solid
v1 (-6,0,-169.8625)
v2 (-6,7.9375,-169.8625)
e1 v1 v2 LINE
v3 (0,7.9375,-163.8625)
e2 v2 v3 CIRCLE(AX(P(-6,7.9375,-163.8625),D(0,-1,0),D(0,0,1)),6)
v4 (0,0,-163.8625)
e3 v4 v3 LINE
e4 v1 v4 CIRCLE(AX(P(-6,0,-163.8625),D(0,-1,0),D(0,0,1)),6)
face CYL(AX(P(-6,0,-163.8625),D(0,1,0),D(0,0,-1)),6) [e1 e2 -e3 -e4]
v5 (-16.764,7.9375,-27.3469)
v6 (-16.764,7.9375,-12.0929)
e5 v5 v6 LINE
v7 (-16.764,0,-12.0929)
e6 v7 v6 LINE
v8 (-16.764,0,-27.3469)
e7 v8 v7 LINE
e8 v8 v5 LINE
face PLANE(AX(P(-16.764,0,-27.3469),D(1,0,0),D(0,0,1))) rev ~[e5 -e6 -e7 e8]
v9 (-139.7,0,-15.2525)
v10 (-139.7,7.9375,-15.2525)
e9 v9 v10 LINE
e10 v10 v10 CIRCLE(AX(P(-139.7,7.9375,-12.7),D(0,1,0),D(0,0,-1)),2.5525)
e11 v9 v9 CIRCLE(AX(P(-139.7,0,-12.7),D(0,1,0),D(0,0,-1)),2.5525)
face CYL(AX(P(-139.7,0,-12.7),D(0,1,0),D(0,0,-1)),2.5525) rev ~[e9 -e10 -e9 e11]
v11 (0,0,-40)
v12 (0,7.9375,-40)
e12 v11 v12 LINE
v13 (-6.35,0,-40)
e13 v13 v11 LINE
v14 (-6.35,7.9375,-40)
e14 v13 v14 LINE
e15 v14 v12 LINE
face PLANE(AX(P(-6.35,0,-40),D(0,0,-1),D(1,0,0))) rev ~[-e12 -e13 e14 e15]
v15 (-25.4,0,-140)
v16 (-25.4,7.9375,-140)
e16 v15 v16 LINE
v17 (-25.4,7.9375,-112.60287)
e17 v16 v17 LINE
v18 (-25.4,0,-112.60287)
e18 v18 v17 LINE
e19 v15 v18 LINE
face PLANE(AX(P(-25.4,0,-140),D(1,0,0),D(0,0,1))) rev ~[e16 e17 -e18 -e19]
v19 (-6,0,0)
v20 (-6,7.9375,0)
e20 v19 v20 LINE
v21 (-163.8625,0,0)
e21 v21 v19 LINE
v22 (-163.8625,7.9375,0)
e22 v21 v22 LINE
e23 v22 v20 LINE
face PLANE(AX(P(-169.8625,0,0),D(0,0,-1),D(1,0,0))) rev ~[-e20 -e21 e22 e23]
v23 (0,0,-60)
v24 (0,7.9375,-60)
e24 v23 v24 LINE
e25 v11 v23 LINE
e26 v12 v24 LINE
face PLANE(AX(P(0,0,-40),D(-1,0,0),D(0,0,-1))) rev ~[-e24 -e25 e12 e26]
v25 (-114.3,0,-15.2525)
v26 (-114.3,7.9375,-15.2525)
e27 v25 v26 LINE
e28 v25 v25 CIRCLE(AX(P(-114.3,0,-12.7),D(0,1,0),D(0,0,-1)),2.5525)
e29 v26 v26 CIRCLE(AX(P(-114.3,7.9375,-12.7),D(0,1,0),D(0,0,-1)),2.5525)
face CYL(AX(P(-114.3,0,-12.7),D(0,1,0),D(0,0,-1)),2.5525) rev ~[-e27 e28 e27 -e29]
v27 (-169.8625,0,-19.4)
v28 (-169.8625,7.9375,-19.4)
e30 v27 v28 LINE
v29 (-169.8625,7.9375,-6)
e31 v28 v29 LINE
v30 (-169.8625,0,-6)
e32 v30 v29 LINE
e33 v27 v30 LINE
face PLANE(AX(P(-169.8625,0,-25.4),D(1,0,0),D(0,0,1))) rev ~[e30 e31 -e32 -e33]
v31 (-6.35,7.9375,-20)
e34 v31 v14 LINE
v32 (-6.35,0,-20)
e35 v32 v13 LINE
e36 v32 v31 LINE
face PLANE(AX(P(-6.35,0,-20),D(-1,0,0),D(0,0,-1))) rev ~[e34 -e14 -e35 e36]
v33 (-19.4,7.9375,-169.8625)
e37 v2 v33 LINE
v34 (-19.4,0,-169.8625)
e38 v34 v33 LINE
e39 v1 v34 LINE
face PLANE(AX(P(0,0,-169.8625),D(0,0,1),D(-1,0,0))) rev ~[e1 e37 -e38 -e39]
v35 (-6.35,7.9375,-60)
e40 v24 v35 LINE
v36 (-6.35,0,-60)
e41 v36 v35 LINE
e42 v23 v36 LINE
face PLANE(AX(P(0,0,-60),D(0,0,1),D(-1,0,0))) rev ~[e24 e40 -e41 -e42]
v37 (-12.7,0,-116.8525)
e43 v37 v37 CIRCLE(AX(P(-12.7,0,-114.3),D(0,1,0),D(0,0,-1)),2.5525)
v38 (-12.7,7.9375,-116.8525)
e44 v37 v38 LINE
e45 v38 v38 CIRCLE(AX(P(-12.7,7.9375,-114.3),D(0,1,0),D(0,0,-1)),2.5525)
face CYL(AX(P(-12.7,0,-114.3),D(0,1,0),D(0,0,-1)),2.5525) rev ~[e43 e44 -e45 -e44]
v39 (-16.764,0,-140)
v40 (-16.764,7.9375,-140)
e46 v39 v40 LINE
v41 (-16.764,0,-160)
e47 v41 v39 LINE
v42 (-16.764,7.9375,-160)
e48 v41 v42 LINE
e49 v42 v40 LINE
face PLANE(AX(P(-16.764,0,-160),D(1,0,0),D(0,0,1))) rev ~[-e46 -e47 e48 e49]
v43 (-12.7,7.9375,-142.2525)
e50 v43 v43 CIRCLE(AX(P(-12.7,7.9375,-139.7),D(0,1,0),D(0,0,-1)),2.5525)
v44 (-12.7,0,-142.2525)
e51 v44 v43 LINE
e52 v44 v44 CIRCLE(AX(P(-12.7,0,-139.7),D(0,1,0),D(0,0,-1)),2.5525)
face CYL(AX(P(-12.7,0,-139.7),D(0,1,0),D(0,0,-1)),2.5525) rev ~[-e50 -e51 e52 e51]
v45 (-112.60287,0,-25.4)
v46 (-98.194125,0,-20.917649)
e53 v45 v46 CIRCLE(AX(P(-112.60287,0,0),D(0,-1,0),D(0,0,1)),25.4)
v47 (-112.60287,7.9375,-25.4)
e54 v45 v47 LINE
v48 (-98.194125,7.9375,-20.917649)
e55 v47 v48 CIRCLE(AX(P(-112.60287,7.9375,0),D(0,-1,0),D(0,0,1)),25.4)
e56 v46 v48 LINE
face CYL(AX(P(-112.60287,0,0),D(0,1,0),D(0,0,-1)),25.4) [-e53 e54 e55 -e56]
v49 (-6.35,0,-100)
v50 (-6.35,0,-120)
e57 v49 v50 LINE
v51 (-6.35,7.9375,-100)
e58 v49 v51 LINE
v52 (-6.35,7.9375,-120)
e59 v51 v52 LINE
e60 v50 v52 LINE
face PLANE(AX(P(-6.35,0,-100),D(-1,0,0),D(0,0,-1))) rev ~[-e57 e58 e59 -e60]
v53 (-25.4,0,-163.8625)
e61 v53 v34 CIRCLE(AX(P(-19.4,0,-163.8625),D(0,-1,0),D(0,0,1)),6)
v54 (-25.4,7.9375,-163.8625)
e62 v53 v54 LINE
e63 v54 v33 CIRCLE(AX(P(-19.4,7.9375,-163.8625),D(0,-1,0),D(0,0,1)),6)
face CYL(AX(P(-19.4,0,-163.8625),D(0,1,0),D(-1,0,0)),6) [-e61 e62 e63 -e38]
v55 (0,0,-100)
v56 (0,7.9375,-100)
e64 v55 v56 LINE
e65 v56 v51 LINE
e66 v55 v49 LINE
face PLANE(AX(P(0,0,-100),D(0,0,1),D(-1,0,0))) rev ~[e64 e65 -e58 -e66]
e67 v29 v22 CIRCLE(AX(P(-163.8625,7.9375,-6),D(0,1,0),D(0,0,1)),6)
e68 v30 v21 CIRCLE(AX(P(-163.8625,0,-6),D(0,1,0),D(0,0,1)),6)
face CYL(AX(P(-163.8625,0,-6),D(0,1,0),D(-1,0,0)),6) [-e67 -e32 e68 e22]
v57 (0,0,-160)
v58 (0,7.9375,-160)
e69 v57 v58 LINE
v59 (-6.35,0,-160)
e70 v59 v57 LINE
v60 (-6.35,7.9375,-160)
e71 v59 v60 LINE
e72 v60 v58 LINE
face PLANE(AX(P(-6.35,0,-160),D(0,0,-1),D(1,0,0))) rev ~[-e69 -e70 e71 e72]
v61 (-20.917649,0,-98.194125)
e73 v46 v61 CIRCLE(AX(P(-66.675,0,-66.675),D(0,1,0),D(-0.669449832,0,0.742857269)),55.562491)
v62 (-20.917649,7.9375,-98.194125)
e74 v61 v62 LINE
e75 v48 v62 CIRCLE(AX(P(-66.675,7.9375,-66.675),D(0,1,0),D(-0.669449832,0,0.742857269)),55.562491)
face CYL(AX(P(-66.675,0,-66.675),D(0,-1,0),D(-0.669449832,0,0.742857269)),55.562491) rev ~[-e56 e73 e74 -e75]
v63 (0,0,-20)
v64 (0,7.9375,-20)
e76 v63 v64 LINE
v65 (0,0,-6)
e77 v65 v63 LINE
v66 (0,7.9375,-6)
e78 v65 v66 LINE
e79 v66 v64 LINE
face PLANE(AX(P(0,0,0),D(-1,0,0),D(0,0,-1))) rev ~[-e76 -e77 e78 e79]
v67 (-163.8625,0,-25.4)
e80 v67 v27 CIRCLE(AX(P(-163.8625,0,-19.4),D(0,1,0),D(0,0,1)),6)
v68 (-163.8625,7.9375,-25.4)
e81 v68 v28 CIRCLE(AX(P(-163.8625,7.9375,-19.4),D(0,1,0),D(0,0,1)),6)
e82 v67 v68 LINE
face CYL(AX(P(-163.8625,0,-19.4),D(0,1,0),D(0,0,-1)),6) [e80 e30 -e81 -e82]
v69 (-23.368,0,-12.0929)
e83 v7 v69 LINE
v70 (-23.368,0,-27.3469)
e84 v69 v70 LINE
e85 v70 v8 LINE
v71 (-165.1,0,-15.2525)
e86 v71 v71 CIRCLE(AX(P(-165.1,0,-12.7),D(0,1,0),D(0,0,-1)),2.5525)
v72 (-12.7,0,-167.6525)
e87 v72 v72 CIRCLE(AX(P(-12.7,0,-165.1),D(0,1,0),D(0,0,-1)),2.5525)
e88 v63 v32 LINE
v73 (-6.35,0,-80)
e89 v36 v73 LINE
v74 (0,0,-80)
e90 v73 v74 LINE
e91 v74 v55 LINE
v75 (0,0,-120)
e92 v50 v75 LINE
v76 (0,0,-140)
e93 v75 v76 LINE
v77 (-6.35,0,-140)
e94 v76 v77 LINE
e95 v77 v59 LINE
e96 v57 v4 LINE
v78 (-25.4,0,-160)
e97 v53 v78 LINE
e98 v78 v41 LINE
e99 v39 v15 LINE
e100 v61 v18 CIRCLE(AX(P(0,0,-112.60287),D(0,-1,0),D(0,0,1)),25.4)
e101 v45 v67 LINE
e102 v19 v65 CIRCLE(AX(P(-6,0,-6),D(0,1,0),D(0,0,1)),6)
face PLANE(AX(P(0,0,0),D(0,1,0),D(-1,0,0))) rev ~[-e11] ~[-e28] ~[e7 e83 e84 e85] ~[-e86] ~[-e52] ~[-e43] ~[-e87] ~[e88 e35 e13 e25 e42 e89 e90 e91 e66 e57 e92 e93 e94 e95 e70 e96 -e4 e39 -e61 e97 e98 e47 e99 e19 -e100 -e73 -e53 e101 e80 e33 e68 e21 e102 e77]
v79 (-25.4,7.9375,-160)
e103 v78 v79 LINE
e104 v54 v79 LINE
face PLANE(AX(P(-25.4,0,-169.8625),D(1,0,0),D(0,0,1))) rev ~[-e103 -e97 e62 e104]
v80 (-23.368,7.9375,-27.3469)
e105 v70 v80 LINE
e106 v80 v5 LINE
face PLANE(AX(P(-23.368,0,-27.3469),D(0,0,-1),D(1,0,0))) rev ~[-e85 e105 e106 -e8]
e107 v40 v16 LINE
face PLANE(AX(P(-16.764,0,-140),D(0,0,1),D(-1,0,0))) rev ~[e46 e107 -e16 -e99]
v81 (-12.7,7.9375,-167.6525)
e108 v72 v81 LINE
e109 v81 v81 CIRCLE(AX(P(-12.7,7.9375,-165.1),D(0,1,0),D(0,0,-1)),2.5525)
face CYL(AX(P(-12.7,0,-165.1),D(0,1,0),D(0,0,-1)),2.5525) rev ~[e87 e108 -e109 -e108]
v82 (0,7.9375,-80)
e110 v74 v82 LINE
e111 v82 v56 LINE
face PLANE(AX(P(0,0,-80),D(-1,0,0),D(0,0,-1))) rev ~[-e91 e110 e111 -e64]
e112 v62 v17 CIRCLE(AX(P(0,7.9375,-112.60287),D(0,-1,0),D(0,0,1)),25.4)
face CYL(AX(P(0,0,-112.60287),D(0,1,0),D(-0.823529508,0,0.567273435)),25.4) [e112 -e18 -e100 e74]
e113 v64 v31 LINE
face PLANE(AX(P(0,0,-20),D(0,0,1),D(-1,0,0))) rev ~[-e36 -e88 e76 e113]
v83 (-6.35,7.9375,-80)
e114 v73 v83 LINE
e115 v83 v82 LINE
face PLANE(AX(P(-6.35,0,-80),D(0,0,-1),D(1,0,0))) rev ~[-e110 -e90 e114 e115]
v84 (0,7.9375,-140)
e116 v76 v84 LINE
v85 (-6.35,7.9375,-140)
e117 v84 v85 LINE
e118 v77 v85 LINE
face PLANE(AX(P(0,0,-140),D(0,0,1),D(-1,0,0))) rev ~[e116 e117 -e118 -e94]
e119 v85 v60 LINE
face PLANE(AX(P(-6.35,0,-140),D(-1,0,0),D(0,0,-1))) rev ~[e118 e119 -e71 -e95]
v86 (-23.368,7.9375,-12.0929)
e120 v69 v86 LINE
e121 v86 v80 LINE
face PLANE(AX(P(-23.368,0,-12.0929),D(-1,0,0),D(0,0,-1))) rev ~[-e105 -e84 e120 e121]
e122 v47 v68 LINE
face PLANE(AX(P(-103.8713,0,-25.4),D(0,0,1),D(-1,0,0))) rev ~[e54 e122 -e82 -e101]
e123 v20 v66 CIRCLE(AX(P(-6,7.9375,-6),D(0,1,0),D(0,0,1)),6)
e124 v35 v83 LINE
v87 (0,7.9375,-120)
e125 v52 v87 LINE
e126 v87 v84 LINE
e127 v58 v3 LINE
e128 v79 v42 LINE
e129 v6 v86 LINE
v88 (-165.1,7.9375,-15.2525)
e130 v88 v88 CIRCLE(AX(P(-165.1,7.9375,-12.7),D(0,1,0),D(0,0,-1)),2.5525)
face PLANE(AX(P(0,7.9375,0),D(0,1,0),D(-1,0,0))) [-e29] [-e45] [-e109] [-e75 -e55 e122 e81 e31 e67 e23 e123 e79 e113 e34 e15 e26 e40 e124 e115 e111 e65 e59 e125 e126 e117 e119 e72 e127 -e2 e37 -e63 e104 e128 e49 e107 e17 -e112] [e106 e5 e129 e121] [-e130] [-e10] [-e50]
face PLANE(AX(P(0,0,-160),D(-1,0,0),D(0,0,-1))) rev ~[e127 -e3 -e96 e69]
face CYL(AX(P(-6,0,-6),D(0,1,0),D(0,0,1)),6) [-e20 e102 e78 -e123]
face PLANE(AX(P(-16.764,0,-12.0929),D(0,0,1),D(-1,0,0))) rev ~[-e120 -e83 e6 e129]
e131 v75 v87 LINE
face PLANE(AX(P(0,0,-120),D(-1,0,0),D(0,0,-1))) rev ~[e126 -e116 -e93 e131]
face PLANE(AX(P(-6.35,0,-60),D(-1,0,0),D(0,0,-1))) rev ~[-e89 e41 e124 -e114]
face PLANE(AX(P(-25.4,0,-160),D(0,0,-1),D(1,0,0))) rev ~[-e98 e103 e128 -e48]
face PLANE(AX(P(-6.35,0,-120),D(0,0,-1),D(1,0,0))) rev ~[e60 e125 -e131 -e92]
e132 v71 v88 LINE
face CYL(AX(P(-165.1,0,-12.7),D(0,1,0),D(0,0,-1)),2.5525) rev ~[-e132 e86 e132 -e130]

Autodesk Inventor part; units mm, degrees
ref_plane "YZ Plane" through (0, 0, 0) normal (1, 0, 0) x (0, 1, 0)
ref_plane "XZ Plane" through (0, 0, 0) normal (0, 1, 0) x (-1, 0, 0)
ref_plane "XY Plane" through (0, 0, 0) normal (0, 0, 1) x (1, 0, 0)
sketch "Sketch1" plane through (0, 0, 0) normal (0, 1, 0) x (-1, 0, 0)
  line L0 (169.8625, 0) -> (0, 0)
  line L1 (0, 0) -> (0, -169.8625)
  line L2 (0, -169.8625) -> (25.4, -169.8625)
  line L3 (25.4, -169.8625) -> (25.4, -103.8713)
  line L4 (103.8713, -25.4) -> (169.8625, -25.4)
  line L5 (169.8625, -25.4) -> (169.8625, 0)
  arc A0 (103.8713, -25.4) -> (25.4, -103.8713) centre (66.675, -66.675) ccw
  line L6 (0, 0) -> (66.675, -66.675) construction
  line L7 (0, -20) -> (6.35, -20)
  line L8 (6.35, -20) -> (6.35, -40)
  line L9 (6.35, -40) -> (0, -40)
  line L10 (0, -40) -> (0, -20)
  line L11 (6.35, -60) -> (6.35, -80)
  line L12 (0, -60) -> (6.35, -60)
  line L13 (6.35, -80) -> (0, -80)
  line L14 (6.35, -100) -> (6.35, -120)
  line L15 (0, -100) -> (6.35, -100)
  line L16 (6.35, -120) -> (0, -120)
  line L17 (6.35, -140) -> (6.35, -160)
  line L18 (0, -140) -> (6.35, -140)
  line L19 (6.35, -160) -> (0, -160)
  line L20 (23.368, -27.3469) -> (16.764, -27.3469)
  line L21 (16.764, -27.3469) -> (16.764, -12.0929)
  line L22 (16.764, -12.0929) -> (23.368, -12.0929)
  line L23 (23.368, -12.0929) -> (23.368, -27.3469)
  line L24 (23.368, -27.3469) -> (16.764, -12.0929) construction
  line L25 (16.764, -27.3469) -> (23.368, -12.0929) construction
  line L26 (25.4, -160) -> (16.764, -160)
  line L27 (16.764, -160) -> (16.764, -140)
  line L28 (16.764, -140) -> (25.4, -140)
  point P0 (103.8713, -25.4)
  point P1 (20.066, -19.7199)
  point P2 (20.066, -12.0929)
  dimension "d0" = 25.4
  dimension "d1" = 169.8625
  dimension "d2" = 25.4
  dimension "d3" = 169.8625
  dimension "d4" = 111.125
  dimension "d5" = 66.675
  dimension "d6" = 45
  dimension "d10" = 6.35
  dimension "d11" = 20
  dimension "d12" = 20
  dimension "d15" = 40
  dimension "d34" = 12.0929
  dimension "d35" = 6.604
  dimension "d36" = 20.066
  dimension "d37" = 15.254
extrude "Plate1" add sketch "Sketch1" along normal blind 7.9375 contours L5 L4 A0 L3 L28 L27 L26 L2 L1 L19 L17 L18 L16 L14 L15 L13 L11 L12 L9 L8 L7 L0
fillet "Corner Round1" radius 25.4 2 edges at (-103.8713, 3.9688, -25.4) (-25.4, 3.9688, -103.8713)
fillet "Corner Round2" radius 6 5 edges at (0, 3.9688, 0) (0, 3.9688, -169.8625) (-25.4, 3.9688, -169.8625) (-169.8625, 3.9688, 0) (-169.8625, 3.9688, -25.4)
sketch "Sketch2" plane through (0, 0, 0) normal (0, -1, 0) x (1, 0, 0)
  line L0 (-169.8625, -19.4) -> (-169.8625, -6) projected
  line L1 (-19.4, -169.8625) -> (-6, -169.8625) projected
  line L2 (-6, -169.8625) -> (-19.4, -169.8625) projected
  point P0 (0, 0)
  point P1 (-165.1, -12.7)
  point P2 (-139.7, -12.7)
  point P3 (-114.3, -12.7)
  point P4 (-12.7, -165.1)
  point P5 (-12.7, -139.7)
  point P6 (-12.7, -114.3)
  point P7 (-169.8625, -12.7)
  point P8 (-169.8625, -12.7)
  point P9 (-12.7, -169.8625)
  dimension "d21" = 25.4
  dimension "d22" = 25.4
  dimension "d23" = 25.4
  dimension "d24" = 25.4
  dimension "d25" = 4.7625
  dimension "d26" = 4.7625
hole "Hole1" at (-165.1, 0, -12.7) at (-139.7, 0, -12.7) at (-114.3, 0, -12.7) at (-12.7, 0, -165.1) at (-12.7, 0, -139.7) at (-12.7, 0, -114.3) direction (0, 1, 0) diameter 5.105 depth 7.9375 tip angle 118 clearance for "Flat Head Machine Screw (82)" size "#10" standard "Ansi Unified Screw Threads"
equation "\"d22\" = d21"
equation "\"d23\" = d21"
equation "\"d24\" = d23"
equation "\"d2\" = d0"
equation "\"d3\" = d1"
equation "\"d12\" = d11"
equation "\"d15\" = 2 * d11"
equation "\"d32\" = Thickness"
equation "\"d8\" = Thickness"
equation "\"BendRadius\" = Thickness"
equation "\"BendReliefWidth\" = Thickness"
equation "\"BendReliefDepth\" = 0.5 * Thickness"
equation "\"CornerReliefSize\" = 4 * Thickness"
equation "\"MinimumRemnant\" = 2 * Thickness"
equation "\"TransitionRadius\" = BendRadius"
equation "\"JacobiRadiusSize\" = BendRadius"
equation "\"GapSize\" = Thickness"
equation "\"Thickness\" = 7.9375"
properties part number "INTAKE_SWERVE_MOUNT" material "Aluminum, 6061-T6"
